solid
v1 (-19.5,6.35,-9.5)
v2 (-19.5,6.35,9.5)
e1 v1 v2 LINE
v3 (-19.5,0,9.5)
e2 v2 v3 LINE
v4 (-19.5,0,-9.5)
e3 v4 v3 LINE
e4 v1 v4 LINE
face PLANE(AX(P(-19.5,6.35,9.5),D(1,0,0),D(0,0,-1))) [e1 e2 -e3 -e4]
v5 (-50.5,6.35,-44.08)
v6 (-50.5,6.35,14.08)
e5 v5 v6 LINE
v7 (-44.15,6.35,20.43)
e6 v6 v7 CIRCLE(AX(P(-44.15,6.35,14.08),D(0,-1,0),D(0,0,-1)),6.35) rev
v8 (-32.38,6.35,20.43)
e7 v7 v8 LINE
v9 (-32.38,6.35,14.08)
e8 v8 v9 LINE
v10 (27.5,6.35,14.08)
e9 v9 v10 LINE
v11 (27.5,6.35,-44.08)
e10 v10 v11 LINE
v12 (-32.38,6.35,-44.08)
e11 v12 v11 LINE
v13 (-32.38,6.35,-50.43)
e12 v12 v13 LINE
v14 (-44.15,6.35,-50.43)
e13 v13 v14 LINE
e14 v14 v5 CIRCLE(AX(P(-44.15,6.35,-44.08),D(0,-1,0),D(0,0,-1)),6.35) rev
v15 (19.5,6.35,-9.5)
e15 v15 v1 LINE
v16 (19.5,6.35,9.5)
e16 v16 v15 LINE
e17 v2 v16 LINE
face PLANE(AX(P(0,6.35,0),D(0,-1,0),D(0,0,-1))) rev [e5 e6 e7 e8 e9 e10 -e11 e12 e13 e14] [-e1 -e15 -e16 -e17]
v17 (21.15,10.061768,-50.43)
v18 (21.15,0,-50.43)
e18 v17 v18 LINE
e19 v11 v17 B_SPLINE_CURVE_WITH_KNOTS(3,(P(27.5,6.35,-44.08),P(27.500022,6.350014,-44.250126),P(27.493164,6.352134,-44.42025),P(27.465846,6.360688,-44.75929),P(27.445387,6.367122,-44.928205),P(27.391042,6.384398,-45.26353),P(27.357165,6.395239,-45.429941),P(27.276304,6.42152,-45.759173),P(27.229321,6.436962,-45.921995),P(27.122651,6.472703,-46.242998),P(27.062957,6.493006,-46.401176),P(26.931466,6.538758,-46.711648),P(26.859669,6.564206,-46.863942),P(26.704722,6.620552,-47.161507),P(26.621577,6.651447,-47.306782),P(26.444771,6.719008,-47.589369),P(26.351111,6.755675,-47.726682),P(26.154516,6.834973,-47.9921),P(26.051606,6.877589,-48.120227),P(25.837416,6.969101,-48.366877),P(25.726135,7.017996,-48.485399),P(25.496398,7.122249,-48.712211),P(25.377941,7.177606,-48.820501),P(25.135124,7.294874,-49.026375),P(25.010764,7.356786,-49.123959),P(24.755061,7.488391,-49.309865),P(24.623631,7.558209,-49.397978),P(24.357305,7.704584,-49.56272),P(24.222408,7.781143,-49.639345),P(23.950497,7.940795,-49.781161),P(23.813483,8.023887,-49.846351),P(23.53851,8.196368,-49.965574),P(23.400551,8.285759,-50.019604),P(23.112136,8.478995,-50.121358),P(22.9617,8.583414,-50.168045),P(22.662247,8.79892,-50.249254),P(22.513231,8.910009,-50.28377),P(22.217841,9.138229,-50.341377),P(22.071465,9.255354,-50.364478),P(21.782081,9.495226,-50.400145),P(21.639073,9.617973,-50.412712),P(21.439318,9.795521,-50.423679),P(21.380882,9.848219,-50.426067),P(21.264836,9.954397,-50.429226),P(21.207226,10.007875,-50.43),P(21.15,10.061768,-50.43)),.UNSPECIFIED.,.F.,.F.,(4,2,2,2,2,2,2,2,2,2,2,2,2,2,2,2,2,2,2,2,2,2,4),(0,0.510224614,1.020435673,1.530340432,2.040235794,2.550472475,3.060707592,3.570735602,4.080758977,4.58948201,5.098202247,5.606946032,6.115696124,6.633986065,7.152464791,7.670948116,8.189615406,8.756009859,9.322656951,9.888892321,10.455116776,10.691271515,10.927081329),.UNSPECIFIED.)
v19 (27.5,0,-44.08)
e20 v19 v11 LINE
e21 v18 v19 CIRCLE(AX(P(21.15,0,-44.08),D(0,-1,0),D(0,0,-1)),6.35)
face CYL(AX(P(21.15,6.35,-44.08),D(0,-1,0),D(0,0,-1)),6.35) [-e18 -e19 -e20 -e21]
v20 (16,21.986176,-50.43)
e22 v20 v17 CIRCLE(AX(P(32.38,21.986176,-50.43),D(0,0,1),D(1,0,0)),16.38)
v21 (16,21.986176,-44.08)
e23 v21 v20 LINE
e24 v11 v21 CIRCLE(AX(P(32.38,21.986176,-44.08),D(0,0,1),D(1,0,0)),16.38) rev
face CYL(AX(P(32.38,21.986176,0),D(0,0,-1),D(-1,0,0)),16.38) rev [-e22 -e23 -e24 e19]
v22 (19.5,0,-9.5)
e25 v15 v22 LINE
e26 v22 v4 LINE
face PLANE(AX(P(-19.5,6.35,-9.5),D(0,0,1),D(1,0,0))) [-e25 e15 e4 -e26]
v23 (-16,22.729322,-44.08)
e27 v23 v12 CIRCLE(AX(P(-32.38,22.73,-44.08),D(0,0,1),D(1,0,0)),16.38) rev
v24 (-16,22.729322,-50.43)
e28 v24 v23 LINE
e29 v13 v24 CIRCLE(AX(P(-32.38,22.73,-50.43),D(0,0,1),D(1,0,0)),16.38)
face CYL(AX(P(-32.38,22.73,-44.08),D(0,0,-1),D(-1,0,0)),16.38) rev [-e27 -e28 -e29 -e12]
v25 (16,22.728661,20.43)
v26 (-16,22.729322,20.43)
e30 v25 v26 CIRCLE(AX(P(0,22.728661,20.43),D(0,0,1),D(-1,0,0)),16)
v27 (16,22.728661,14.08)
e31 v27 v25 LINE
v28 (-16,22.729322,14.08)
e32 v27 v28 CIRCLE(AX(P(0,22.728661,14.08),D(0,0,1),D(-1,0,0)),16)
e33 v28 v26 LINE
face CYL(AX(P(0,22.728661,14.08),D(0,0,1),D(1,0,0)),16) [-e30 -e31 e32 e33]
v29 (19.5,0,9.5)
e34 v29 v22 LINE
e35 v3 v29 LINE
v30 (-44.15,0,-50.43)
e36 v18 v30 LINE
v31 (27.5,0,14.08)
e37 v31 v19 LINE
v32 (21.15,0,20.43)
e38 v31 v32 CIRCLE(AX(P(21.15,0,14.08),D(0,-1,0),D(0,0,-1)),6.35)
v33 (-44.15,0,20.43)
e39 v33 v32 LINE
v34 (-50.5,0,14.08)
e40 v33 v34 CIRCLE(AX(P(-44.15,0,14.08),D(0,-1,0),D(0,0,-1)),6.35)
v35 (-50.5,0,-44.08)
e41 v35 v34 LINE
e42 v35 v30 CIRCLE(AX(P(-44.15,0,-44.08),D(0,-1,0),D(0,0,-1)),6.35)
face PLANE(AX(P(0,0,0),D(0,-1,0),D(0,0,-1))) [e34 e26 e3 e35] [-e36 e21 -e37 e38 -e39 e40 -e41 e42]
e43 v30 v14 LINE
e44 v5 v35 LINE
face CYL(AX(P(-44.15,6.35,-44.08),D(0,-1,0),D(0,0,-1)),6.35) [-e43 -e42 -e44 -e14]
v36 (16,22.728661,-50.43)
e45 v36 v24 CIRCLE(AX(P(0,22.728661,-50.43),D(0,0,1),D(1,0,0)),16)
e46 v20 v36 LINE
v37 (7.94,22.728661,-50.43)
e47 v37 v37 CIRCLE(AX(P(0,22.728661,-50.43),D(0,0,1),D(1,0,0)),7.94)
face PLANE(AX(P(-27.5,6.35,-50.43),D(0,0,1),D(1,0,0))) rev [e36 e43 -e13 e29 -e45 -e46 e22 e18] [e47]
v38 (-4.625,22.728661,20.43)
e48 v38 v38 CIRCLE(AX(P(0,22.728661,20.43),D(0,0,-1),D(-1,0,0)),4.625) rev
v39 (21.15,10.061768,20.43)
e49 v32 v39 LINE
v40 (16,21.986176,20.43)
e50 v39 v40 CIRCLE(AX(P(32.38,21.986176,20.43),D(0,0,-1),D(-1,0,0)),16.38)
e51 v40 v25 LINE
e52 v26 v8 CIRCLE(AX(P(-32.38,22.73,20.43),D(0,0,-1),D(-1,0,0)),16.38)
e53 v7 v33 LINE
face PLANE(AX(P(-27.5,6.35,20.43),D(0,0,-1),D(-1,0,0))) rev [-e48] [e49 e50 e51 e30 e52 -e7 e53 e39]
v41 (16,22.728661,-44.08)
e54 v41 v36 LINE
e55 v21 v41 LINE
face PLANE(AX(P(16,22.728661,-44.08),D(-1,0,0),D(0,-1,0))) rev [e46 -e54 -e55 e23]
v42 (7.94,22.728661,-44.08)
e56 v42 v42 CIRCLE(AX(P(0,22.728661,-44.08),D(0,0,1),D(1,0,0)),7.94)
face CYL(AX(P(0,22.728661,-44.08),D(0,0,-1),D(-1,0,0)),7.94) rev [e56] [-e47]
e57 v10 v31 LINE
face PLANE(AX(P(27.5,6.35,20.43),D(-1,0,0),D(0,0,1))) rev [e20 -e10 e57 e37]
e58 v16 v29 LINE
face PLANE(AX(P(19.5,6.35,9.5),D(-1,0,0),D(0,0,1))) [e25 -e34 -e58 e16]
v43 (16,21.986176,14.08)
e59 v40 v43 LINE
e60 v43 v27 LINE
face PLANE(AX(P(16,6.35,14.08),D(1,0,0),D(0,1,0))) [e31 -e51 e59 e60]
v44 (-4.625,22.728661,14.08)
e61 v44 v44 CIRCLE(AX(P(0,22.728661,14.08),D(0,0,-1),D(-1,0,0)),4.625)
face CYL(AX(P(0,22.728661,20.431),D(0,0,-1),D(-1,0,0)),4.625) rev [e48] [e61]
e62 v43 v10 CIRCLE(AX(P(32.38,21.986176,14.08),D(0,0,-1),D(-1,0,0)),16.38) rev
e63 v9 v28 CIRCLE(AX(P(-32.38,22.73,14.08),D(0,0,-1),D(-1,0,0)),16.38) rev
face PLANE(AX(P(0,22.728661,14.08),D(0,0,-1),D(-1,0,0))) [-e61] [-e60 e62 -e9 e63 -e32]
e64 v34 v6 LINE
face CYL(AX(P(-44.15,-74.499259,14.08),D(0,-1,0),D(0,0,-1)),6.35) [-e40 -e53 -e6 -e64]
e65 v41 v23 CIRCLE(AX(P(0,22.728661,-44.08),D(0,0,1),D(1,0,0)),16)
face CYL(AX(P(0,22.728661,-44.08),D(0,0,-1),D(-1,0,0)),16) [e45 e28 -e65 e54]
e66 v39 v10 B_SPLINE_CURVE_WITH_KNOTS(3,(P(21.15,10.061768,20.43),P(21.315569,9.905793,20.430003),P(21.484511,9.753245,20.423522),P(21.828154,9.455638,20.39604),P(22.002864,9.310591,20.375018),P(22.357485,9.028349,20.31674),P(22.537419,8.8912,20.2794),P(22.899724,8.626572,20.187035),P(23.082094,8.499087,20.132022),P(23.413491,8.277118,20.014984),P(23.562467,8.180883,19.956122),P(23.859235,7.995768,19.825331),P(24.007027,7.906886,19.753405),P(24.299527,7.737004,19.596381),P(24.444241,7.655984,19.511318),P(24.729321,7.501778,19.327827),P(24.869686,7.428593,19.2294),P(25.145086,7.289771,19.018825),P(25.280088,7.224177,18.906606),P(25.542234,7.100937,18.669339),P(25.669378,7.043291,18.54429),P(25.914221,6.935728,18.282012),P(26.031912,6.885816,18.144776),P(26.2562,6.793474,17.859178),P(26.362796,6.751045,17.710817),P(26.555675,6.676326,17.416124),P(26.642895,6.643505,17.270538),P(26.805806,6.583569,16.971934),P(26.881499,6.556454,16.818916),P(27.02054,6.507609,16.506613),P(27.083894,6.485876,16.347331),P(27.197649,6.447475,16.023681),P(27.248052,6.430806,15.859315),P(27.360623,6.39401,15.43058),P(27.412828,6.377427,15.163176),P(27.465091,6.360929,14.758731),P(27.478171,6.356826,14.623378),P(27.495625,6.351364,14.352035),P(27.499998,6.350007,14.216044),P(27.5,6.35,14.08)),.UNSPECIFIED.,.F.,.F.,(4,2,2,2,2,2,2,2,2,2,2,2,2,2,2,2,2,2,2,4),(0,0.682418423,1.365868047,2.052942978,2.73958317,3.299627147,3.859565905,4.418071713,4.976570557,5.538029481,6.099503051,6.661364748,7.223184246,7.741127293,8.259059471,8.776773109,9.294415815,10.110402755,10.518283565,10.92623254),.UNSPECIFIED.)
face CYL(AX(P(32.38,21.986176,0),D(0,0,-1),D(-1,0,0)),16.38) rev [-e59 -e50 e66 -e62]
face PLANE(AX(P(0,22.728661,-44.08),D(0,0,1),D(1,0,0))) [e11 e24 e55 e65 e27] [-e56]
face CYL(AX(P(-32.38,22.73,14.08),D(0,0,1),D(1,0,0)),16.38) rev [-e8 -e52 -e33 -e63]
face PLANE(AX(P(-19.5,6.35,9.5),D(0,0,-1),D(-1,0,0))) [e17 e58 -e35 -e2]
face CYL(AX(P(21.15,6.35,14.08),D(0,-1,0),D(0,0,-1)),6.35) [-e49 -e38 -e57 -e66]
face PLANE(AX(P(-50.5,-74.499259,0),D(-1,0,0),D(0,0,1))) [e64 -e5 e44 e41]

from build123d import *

# Parameters (mm, degrees)
SKETCH1_W            = 55
SKETCH1_H            = 70.86
SKETCH1_W_2          = 39
SKETCH1_H_2          = 19
BOSS_EXTRUDE1_DEPTH  = 6.35
SKETCH12_R           = 7.94
BOSS_EXTRUDE11_DEPTH = 6.35
BOSS_EXTRUDE14_START = -6.35
BOSS_EXTRUDE14_DEPTH = 6.35
SKETCH15_W           = 23
SKETCH15_H           = 70.86
BOSS_EXTRUDE13_DEPTH = 6.35
FILLET2_R            = 16.38
FILLET3_R            = 6.35
CUT_EXTRUDE1_REACH   = 92.618
SKETCH17_R           = 4.625


with BuildPart() as part:
    # Sketch1 → Boss-Extrude1 (new body)
    with BuildSketch(Plane(origin=(0, 0, 0), x_dir=(1, 0, 0), z_dir=(0, 1, 0))):
        with Locations((0, 15)):
            Rectangle(SKETCH1_W, SKETCH1_H)
        Rectangle(SKETCH1_W_2, SKETCH1_H_2, mode=Mode.SUBTRACT)
    extrude(amount=BOSS_EXTRUDE1_DEPTH)

    # Sketch12 → Boss-Extrude11 (add)
    with BuildSketch(Plane.XY.offset(-50.43)):
        with BuildLine():
            Line((16, 22.728660684), (16, 6.35))
            Line((16, 6.35), (-16, 6.35))
            Line((-16, 6.35), (-16, 22.728660684))
            ThreePointArc((-16, 22.728660684), (0, 38.728660684), (16, 22.728660684))
        make_face()
        with Locations((0, 22.728660684)):
            Circle(SKETCH12_R, mode=Mode.SUBTRACT)
    extrude(amount=BOSS_EXTRUDE11_DEPTH)

    # Sketch16 → Boss-Extrude14 (add)
    with BuildSketch(Plane.XY.offset(20.43).offset(BOSS_EXTRUDE14_START)):
        with BuildLine():
            Line((-16, 6.35), (-16, 22.728660684))
            ThreePointArc((-16, 22.728660684), (0, 38.728660684), (16, 22.728660684))
            Line((16, 22.728660684), (16, 6.35))
            Line((16, 6.35), (-16, 6.35))
        make_face()
    extrude(amount=BOSS_EXTRUDE14_DEPTH)

    # Sketch15 → Boss-Extrude13 (add)
    with BuildSketch(Plane(origin=(0, 6.35, 0), x_dir=(1, 0, 0), z_dir=(0, 1, 0))):
        with Locations((-39, 15)):
            Rectangle(SKETCH15_W, SKETCH15_H)
    extrude(amount=-BOSS_EXTRUDE13_DEPTH)

    # Fillet2
    # the kernel refuses this fillet: 16.38 mm, written as the material it adds along each edge
    with BuildSketch(Plane(origin=(16, 6.35, -50.43), x_dir=(0, 1, 0), z_dir=(0, 0, 1)), Plane(origin=(16, 6.35, 14.08), x_dir=(0, 1, 0), z_dir=(0, 0, 1))) as fillet2_piece_1:
        with BuildLine():
            CenterArc((15.636176003, -16.38), FILLET2_R, 90, 72.667025782)
            Line((0, -11.5), (0, 0))
            Line((0, 0), (15.636176003, 0))
        make_face()
    fillet2_piece_1_solid = extrude(amount=6.35, mode=Mode.PRIVATE)
    with BuildSketch(Plane(origin=(-16, 6.35, 14.08), x_dir=(8.356150350670102e-10, 1.0, 0), z_dir=(0, 0, 1)), Plane(origin=(-16, 6.35, -50.43), x_dir=(8.356150350670102e-10, 1.0, 0), z_dir=(0, 0, 1))) as fillet2_piece_2:
        with BuildLine():
            CenterArc((16.379999986, 16.379999986), FILLET2_R, 180.000000048, 89.997630107)
            Line((-1.4e-08, 16.379999972), (-1.638000014, 16.379999971))
            Line((-1.638000014, 16.379999971), (-1.637999999, -1.638000001))
            Line((-1.637999999, -1.638000001), (16.379254733, -1.637999999))
            Line((16.379254733, -1.637999999), (16.379322483, 0))
        make_face()
    fillet2_piece_2_solid = extrude(amount=6.35, mode=Mode.PRIVATE)
    add([fillet2_piece_1_solid, fillet2_piece_2_solid])

    # Fillet3
    fillet3_edges = [part.edges().sort_by_distance(p)[0] for p in [
        (27.5, 3.175, -50.43),
        (27.5, 3.175, 20.43),
        (-50.5, 3.175, 20.43),
        (-50.5, 3.175, -50.43),
    ]]
    fillet(fillet3_edges, radius=FILLET3_R)

    # Sketch17 → Cut-Extrude1 (cut, up to next)
    with BuildSketch(Plane(origin=(0, 0, 14.08), x_dir=(-1, 0, 0), z_dir=(0, 0, -1)), mode=Mode.PRIVATE) as cut_extrude1_sk1:
        with Locations((0, 22.728660684)):
            Circle(SKETCH17_R)
    cut_extrude1_tool1 = extrude(cut_extrude1_sk1.sketch, amount=-CUT_EXTRUDE1_REACH, mode=Mode.PRIVATE) & part.part
    add(cut_extrude1_tool1.solids().sort_by_distance((0, 22.728661, 14.08))[0], mode=Mode.SUBTRACT)


solid = part.part
